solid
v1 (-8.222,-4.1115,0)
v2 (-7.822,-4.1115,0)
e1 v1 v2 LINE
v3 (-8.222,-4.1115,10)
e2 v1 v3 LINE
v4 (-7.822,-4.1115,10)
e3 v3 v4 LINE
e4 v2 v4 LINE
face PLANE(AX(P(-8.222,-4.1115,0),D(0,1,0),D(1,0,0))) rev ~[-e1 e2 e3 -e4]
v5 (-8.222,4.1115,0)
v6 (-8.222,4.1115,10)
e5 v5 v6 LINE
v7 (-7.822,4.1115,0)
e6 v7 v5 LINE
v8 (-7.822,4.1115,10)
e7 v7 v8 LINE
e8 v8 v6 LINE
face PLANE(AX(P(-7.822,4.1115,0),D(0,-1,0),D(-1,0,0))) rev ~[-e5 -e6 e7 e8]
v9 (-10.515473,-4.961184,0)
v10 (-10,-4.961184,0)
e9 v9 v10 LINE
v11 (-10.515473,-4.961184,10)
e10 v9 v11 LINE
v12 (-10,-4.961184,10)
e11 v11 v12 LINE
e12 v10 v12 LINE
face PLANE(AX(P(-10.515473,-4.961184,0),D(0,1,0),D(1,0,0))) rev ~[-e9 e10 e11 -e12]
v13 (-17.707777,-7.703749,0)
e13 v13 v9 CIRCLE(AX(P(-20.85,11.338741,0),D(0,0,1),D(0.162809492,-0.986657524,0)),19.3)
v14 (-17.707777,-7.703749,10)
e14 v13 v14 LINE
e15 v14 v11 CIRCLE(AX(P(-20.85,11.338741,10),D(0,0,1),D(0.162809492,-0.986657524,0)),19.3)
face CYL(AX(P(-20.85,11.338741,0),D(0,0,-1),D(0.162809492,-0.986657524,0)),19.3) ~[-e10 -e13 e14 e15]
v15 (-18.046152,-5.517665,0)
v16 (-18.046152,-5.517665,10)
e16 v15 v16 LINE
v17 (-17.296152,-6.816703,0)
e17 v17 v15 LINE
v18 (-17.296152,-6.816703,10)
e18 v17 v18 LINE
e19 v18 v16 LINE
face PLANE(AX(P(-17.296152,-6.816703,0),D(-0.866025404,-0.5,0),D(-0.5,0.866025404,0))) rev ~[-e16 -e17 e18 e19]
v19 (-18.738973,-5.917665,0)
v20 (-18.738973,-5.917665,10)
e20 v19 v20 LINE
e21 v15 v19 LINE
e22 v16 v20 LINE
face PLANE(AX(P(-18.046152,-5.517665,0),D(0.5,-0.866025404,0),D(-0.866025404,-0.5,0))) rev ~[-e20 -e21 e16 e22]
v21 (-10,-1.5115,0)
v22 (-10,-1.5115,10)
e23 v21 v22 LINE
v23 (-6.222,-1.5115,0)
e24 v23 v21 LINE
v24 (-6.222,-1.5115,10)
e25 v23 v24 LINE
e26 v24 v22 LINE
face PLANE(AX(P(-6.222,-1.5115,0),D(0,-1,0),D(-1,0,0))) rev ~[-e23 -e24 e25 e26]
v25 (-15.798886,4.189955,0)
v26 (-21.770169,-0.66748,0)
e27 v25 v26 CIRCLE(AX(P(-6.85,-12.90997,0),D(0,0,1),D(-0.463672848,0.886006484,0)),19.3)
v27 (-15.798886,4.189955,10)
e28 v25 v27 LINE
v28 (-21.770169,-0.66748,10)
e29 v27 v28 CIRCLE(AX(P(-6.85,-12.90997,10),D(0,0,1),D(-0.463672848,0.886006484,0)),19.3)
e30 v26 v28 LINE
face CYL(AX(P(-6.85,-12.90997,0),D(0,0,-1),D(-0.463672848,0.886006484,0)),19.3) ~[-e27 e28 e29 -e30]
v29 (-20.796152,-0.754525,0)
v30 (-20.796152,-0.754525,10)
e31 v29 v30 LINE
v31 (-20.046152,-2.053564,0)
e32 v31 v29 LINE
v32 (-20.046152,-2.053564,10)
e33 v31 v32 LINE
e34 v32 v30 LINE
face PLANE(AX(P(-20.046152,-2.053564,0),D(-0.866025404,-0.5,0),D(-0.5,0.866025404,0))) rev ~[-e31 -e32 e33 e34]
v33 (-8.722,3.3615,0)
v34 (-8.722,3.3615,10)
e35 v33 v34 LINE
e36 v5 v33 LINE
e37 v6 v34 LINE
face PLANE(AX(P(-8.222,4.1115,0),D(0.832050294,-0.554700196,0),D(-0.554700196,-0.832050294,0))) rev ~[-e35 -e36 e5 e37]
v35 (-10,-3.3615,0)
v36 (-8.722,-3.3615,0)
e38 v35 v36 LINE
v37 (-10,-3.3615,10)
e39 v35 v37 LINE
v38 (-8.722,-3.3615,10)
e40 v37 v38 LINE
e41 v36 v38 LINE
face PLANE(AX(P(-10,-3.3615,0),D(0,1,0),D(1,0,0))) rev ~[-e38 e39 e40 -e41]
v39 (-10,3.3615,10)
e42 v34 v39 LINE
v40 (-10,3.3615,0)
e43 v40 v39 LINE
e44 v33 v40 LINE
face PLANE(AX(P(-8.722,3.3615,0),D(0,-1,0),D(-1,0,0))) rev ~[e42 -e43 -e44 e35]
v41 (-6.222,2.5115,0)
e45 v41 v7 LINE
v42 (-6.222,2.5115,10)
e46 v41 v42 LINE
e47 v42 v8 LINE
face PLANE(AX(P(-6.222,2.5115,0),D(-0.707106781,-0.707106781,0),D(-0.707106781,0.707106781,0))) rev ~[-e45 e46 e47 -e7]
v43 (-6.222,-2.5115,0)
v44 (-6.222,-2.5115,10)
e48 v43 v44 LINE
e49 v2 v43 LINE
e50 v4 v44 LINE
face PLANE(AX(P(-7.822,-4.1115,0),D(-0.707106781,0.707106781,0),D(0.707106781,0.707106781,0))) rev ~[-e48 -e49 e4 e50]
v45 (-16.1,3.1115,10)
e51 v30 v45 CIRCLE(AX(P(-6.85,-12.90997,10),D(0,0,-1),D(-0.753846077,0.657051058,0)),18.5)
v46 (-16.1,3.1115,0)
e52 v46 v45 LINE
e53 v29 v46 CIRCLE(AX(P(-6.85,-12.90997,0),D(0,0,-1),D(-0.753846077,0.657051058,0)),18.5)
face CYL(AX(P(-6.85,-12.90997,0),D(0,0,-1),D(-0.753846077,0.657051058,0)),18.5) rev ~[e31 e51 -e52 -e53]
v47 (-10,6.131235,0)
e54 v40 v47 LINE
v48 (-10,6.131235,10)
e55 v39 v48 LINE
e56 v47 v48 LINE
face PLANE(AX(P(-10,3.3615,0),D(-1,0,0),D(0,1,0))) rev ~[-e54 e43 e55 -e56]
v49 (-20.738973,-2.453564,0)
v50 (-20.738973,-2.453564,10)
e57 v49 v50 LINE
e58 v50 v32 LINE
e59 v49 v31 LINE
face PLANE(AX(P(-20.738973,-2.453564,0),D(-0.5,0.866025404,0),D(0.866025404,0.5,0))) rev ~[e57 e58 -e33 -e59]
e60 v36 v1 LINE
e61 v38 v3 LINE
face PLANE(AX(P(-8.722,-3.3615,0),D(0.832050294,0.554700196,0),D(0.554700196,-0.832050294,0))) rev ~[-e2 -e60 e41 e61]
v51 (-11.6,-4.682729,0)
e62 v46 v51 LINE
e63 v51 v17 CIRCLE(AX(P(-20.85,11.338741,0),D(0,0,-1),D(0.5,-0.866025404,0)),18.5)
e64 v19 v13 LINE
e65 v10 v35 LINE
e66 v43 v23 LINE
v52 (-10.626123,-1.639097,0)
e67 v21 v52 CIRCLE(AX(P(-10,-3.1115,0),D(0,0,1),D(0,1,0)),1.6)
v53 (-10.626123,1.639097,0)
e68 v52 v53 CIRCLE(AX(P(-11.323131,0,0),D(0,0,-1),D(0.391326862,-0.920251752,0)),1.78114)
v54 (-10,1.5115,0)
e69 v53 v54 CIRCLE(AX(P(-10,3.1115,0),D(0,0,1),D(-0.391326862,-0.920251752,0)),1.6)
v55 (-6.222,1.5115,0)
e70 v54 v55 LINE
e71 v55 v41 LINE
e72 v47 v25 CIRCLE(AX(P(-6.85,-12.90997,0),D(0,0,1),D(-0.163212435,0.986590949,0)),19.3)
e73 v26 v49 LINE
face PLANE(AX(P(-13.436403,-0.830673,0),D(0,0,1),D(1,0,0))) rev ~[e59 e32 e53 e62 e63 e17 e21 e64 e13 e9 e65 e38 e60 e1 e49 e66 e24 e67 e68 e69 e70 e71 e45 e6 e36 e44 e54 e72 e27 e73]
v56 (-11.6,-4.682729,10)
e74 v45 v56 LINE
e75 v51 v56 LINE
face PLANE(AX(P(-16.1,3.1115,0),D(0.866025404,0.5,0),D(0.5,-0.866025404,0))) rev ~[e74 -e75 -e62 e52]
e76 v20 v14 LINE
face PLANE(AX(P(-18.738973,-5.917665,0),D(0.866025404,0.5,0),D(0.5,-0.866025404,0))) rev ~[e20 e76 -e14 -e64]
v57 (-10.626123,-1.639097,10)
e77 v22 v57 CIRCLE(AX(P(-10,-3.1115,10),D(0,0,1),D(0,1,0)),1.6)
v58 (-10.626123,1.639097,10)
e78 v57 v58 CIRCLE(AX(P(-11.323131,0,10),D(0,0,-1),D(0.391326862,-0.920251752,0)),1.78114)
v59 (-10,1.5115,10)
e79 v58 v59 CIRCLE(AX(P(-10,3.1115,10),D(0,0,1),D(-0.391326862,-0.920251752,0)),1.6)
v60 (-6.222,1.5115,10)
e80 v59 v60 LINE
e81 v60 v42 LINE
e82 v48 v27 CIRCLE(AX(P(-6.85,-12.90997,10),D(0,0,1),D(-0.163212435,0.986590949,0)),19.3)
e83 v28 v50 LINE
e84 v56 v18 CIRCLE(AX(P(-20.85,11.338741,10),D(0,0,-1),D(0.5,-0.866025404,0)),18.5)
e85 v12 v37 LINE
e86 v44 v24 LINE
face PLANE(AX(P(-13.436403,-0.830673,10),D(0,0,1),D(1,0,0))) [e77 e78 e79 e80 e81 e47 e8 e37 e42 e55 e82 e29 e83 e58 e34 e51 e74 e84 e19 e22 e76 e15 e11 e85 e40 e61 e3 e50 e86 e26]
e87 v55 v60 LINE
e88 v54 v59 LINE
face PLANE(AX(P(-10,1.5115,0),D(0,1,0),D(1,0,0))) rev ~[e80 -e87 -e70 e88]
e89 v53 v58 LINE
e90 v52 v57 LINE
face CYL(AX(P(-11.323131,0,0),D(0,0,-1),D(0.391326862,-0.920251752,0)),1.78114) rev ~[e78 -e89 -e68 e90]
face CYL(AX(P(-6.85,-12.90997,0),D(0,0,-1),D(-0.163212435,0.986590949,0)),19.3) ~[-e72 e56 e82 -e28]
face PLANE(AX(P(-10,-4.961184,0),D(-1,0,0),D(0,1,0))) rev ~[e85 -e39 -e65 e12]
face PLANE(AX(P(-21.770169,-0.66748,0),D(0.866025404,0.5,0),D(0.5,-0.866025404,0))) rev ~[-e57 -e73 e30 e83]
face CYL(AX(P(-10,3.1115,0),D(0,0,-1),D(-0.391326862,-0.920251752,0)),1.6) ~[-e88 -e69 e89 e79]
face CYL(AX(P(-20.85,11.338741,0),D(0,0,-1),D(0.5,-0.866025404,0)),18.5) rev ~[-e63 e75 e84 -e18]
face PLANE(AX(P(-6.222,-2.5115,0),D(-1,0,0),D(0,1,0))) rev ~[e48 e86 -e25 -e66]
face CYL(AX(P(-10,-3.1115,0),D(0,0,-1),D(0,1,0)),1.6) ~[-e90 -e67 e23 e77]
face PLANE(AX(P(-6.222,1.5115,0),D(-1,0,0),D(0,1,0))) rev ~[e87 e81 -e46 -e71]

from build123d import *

# Parameters (mm, degrees)
F2_DEPTH = 10


# Not quite as in the source:
# - a feature names something its author has since deleted; it is built from what else it names


with BuildPart() as f2:
    # F1 (on Top) → F2 (new body)
    with BuildSketch(Plane.XY):
        with BuildLine():
            ThreePointArc((-20.7961524227, -0.7545254038), (-18.6080572337, 1.3728200267), (-16.1, 3.1115))
            Line((-16.1, 3.1115), (-11.6, -4.6827286341))
            ThreePointArc((-11.6, -4.6827286341), (-14.3597696428, -5.9854299259), (-17.2961524227, -6.8167032303))
            Line((-17.2961524227, -6.8167032303), (-18.0461524227, -5.5176651246))
            Line((-18.0461524227, -5.5176651246), (-18.7389727457, -5.9176651246))
            Line((-18.7389727457, -5.9176651246), (-17.7077768116, -7.703748875))
            ThreePointArc((-17.7077768116, -7.703748875), (-13.9735101965, -6.69466899), (-10.5154733964, -4.9611838136))
            Line((-10.5154733964, -4.9611838136), (-10, -4.9611838136))
            Line((-10, -4.9611838136), (-10, -3.3615))
            Line((-10, -3.3615), (-8.722, -3.3615))
            Line((-8.722, -3.3615), (-8.222, -4.1115))
            Line((-8.222, -4.1115), (-7.822, -4.1115))
            Line((-7.822, -4.1115), (-6.222, -2.5115))
            Line((-6.222, -2.5115), (-6.222, -1.5115))
            Line((-6.222, -1.5115), (-10, -1.5115))
            ThreePointArc((-10, -1.5115), (-10.319496099, -1.5437237906), (-10.6261229788, -1.6390971966))
            ThreePointArc((-10.6261229788, -1.6390971966), (-13.1042708913, 0), (-10.6261229788, 1.6390971966))
            ThreePointArc((-10.6261229788, 1.6390971966), (-10.319496099, 1.5437237906), (-10, 1.5115))
            Line((-10, 1.5115), (-6.222, 1.5115))
            Line((-6.222, 1.5115), (-6.222, 2.5115))
            Line((-6.222, 2.5115), (-7.822, 4.1115))
            Line((-7.822, 4.1115), (-8.222, 4.1115))
            Line((-8.222, 4.1115), (-8.722, 3.3615))
            Line((-8.722, 3.3615), (-10, 3.3615))
            Line((-10, 3.3615), (-10, 4.1899551795))
            Line((-10, 4.1899551795), (-10, 6.131235349))
            ThreePointArc((-10, 6.131235349), (-12.9768183038, 5.3917266036), (-15.7988859575, 4.1899551795))
            ThreePointArc((-15.7988859575, 4.1899551795), (-19.0291465574, 2.0619500516), (-21.7701686798, -0.6674797591))
            Line((-21.7701686798, -0.6674797591), (-20.7389727457, -2.4535635095))
            Line((-20.7389727457, -2.4535635095), (-20.0461524227, -2.0535635095))
            Line((-20.0461524227, -2.0535635095), (-20.7961524227, -0.7545254038))
        make_face()
    extrude(amount=F2_DEPTH)


solid = f2.part
